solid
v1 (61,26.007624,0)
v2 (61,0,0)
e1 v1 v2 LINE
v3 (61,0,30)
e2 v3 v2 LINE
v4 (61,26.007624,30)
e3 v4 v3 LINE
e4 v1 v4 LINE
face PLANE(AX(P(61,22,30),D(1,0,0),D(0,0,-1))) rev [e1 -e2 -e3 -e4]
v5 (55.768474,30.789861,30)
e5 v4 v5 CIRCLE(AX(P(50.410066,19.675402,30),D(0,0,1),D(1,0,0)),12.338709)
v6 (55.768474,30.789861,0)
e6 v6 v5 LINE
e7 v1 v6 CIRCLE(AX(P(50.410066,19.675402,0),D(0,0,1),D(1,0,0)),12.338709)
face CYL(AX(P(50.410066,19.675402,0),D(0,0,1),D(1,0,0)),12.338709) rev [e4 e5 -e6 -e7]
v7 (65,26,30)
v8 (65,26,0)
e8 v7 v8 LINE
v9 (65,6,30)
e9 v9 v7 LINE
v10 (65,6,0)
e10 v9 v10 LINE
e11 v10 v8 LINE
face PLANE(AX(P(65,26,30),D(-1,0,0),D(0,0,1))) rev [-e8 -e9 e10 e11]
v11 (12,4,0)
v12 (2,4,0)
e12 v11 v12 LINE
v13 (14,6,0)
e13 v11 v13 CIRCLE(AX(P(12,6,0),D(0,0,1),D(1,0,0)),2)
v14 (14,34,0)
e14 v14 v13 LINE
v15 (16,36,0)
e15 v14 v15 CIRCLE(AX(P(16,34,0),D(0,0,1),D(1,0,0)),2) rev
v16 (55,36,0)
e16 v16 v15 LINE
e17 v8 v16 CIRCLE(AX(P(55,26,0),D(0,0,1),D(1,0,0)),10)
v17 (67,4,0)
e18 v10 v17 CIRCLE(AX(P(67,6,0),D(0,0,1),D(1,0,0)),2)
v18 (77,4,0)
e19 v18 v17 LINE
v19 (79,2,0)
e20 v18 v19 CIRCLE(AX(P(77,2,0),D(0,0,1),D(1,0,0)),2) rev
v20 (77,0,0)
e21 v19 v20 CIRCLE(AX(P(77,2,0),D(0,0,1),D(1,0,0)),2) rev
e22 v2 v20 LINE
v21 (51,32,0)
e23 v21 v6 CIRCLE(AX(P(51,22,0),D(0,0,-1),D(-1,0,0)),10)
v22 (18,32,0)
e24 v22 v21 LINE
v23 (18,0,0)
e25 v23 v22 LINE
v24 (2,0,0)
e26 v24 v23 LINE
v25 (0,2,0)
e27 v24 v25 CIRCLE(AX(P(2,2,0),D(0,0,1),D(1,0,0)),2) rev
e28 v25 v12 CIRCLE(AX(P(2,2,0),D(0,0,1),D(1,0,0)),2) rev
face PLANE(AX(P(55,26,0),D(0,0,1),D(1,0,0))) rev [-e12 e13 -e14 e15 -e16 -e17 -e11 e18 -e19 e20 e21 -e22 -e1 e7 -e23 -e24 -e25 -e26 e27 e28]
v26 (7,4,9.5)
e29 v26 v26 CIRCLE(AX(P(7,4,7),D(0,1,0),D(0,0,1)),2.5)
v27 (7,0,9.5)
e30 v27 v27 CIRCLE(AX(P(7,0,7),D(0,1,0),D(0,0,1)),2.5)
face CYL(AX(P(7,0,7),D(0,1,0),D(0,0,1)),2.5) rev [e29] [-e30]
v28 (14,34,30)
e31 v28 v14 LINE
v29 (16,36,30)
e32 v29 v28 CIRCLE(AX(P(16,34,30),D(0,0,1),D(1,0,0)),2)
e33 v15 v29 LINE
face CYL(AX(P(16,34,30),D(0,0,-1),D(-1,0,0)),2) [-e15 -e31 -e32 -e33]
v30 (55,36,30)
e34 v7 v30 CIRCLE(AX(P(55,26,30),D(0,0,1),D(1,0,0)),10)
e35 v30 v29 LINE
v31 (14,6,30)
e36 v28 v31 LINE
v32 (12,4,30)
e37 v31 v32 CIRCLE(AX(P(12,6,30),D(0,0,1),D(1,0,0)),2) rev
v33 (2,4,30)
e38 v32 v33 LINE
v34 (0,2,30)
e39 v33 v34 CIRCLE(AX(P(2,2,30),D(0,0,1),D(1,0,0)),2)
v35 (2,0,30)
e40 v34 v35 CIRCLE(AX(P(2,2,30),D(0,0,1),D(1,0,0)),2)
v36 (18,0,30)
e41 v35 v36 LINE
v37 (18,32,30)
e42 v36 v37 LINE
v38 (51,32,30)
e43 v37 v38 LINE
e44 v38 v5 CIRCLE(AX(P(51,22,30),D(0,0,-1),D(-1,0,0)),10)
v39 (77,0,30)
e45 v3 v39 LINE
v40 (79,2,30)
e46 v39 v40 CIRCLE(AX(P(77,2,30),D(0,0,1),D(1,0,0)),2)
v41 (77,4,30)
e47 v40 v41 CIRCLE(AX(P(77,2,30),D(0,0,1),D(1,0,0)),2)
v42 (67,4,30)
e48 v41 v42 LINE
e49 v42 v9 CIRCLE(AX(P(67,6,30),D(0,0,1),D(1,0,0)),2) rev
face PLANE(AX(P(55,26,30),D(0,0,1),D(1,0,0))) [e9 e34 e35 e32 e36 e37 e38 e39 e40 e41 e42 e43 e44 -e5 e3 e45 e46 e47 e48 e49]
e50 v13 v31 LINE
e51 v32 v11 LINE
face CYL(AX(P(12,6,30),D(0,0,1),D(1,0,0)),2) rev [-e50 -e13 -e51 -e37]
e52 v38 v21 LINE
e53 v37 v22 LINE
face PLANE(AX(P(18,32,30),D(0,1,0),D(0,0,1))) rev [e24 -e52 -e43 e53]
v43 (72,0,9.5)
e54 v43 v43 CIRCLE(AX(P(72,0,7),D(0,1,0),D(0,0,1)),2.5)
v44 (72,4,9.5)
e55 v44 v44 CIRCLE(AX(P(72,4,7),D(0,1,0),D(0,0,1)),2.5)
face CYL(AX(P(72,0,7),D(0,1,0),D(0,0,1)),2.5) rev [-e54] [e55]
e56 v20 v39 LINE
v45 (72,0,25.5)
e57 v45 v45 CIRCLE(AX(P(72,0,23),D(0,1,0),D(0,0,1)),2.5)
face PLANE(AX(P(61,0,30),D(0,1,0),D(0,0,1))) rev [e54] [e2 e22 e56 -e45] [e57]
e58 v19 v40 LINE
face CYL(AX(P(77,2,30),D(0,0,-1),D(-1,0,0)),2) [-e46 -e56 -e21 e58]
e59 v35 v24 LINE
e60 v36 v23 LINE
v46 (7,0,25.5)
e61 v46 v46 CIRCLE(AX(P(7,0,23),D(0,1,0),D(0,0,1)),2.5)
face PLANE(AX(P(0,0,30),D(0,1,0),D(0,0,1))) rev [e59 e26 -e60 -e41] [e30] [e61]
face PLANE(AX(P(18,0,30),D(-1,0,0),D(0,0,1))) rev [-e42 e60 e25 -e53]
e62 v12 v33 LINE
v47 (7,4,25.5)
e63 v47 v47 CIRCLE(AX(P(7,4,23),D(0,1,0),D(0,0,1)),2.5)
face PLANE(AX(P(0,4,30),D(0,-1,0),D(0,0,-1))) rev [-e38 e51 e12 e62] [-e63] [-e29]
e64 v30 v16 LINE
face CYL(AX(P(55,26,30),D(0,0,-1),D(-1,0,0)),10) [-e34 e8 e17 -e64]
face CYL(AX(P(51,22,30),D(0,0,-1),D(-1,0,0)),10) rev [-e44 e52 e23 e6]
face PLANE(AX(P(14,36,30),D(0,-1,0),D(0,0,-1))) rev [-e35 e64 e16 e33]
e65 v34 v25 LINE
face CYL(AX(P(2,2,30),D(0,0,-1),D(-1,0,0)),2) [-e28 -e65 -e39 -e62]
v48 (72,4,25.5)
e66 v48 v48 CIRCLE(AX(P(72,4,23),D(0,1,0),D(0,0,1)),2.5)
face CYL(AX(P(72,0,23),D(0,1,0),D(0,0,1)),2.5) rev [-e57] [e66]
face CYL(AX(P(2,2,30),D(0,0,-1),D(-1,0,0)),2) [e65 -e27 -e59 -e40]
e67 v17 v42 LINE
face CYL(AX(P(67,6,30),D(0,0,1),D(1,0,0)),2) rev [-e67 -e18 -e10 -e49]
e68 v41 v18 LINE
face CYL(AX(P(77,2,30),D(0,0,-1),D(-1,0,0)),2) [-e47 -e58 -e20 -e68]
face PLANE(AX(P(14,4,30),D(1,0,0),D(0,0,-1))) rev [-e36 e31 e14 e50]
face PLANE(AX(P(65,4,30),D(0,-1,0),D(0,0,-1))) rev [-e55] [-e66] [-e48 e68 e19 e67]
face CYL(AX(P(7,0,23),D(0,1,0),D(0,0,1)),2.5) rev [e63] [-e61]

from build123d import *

# Parameters (mm, degrees)
BOSS_EXTRUDE1_DEPTH = 30
SKETCH2_R           = 2.5
CUT_EXTRUDE1_DEPTH  = 91.360389552
CUT_EXTRUDE2_DEPTH  = 92.853143659
FILLET1_R           = 2


with BuildPart() as part:
    # Sketch1 → Boss-Extrude1 (new body)
    with BuildSketch(Plane.XY):
        with BuildLine():
            Line((0, 0), (18, 0))
            Line((18, 0), (18, 32))
            Line((18, 32), (51, 32))
            ThreePointArc((51, 32), (58.071067812, 29.071067812), (61, 22))
            Line((61, 22), (61, 0))
            Line((61, 0), (79, 0))
            Line((79, 0), (79, 4))
            Line((79, 4), (65, 4))
            Line((65, 4), (65, 26))
            ThreePointArc((65, 26), (62.071067812, 33.071067812), (55, 36))
            Line((55, 36), (14, 36))
            Line((14, 36), (14, 4))
            Line((14, 4), (0, 4))
            Line((0, 4), (0, 0))
        make_face()
    extrude(amount=BOSS_EXTRUDE1_DEPTH)

    # Sketch2 → Cut-Extrude1 (cut, through all)
    with BuildSketch(Plane(origin=(0, 4, 0), x_dir=(1, 0, 0), z_dir=(0, 1, 0))):
        with Locations(Location((7, -7, 0), (0, 0, 270))):
            Circle(SKETCH2_R)
        with Locations(Location((7, -23, 0), (0, 0, 270))):
            Circle(SKETCH2_R)
        with Locations(Location((72, -7, 0), (0, 0, 270))):
            Circle(SKETCH2_R)
        with Locations(Location((72, -23, 0), (0, 0, 270))):
            Circle(SKETCH2_R)
    extrude(amount=-CUT_EXTRUDE1_DEPTH, mode=Mode.SUBTRACT)

    # Sketch3 → Cut-Extrude2 (cut, through all)
    with BuildSketch(Plane.XY.offset(30)):
        with BuildLine():
            ThreePointArc((55.768474142, 30.789860884), (59.593158366, 27.114452981), (61, 22))
            Line((61, 22), (61, 26.007623502))
            ThreePointArc((61, 26.007623502), (58.735019606, 28.782480547), (55.768474142, 30.789860884))
        make_face()
    extrude(amount=-CUT_EXTRUDE2_DEPTH, mode=Mode.SUBTRACT)

    # Fillet1
    fillet1_edges = [part.edges().sort_by_distance(p)[0] for p in [
        (79, 0, 15),
        (79, 4, 15),
        (65, 4, 15),
        (14, 36, 15),
        (0, 0, 15),
        (0, 4, 15),
        (14, 4, 15),
    ]]
    fillet(fillet1_edges, radius=FILLET1_R - 0.0001)  # a hair under: the kernel refuses the full size


solid = part.part
